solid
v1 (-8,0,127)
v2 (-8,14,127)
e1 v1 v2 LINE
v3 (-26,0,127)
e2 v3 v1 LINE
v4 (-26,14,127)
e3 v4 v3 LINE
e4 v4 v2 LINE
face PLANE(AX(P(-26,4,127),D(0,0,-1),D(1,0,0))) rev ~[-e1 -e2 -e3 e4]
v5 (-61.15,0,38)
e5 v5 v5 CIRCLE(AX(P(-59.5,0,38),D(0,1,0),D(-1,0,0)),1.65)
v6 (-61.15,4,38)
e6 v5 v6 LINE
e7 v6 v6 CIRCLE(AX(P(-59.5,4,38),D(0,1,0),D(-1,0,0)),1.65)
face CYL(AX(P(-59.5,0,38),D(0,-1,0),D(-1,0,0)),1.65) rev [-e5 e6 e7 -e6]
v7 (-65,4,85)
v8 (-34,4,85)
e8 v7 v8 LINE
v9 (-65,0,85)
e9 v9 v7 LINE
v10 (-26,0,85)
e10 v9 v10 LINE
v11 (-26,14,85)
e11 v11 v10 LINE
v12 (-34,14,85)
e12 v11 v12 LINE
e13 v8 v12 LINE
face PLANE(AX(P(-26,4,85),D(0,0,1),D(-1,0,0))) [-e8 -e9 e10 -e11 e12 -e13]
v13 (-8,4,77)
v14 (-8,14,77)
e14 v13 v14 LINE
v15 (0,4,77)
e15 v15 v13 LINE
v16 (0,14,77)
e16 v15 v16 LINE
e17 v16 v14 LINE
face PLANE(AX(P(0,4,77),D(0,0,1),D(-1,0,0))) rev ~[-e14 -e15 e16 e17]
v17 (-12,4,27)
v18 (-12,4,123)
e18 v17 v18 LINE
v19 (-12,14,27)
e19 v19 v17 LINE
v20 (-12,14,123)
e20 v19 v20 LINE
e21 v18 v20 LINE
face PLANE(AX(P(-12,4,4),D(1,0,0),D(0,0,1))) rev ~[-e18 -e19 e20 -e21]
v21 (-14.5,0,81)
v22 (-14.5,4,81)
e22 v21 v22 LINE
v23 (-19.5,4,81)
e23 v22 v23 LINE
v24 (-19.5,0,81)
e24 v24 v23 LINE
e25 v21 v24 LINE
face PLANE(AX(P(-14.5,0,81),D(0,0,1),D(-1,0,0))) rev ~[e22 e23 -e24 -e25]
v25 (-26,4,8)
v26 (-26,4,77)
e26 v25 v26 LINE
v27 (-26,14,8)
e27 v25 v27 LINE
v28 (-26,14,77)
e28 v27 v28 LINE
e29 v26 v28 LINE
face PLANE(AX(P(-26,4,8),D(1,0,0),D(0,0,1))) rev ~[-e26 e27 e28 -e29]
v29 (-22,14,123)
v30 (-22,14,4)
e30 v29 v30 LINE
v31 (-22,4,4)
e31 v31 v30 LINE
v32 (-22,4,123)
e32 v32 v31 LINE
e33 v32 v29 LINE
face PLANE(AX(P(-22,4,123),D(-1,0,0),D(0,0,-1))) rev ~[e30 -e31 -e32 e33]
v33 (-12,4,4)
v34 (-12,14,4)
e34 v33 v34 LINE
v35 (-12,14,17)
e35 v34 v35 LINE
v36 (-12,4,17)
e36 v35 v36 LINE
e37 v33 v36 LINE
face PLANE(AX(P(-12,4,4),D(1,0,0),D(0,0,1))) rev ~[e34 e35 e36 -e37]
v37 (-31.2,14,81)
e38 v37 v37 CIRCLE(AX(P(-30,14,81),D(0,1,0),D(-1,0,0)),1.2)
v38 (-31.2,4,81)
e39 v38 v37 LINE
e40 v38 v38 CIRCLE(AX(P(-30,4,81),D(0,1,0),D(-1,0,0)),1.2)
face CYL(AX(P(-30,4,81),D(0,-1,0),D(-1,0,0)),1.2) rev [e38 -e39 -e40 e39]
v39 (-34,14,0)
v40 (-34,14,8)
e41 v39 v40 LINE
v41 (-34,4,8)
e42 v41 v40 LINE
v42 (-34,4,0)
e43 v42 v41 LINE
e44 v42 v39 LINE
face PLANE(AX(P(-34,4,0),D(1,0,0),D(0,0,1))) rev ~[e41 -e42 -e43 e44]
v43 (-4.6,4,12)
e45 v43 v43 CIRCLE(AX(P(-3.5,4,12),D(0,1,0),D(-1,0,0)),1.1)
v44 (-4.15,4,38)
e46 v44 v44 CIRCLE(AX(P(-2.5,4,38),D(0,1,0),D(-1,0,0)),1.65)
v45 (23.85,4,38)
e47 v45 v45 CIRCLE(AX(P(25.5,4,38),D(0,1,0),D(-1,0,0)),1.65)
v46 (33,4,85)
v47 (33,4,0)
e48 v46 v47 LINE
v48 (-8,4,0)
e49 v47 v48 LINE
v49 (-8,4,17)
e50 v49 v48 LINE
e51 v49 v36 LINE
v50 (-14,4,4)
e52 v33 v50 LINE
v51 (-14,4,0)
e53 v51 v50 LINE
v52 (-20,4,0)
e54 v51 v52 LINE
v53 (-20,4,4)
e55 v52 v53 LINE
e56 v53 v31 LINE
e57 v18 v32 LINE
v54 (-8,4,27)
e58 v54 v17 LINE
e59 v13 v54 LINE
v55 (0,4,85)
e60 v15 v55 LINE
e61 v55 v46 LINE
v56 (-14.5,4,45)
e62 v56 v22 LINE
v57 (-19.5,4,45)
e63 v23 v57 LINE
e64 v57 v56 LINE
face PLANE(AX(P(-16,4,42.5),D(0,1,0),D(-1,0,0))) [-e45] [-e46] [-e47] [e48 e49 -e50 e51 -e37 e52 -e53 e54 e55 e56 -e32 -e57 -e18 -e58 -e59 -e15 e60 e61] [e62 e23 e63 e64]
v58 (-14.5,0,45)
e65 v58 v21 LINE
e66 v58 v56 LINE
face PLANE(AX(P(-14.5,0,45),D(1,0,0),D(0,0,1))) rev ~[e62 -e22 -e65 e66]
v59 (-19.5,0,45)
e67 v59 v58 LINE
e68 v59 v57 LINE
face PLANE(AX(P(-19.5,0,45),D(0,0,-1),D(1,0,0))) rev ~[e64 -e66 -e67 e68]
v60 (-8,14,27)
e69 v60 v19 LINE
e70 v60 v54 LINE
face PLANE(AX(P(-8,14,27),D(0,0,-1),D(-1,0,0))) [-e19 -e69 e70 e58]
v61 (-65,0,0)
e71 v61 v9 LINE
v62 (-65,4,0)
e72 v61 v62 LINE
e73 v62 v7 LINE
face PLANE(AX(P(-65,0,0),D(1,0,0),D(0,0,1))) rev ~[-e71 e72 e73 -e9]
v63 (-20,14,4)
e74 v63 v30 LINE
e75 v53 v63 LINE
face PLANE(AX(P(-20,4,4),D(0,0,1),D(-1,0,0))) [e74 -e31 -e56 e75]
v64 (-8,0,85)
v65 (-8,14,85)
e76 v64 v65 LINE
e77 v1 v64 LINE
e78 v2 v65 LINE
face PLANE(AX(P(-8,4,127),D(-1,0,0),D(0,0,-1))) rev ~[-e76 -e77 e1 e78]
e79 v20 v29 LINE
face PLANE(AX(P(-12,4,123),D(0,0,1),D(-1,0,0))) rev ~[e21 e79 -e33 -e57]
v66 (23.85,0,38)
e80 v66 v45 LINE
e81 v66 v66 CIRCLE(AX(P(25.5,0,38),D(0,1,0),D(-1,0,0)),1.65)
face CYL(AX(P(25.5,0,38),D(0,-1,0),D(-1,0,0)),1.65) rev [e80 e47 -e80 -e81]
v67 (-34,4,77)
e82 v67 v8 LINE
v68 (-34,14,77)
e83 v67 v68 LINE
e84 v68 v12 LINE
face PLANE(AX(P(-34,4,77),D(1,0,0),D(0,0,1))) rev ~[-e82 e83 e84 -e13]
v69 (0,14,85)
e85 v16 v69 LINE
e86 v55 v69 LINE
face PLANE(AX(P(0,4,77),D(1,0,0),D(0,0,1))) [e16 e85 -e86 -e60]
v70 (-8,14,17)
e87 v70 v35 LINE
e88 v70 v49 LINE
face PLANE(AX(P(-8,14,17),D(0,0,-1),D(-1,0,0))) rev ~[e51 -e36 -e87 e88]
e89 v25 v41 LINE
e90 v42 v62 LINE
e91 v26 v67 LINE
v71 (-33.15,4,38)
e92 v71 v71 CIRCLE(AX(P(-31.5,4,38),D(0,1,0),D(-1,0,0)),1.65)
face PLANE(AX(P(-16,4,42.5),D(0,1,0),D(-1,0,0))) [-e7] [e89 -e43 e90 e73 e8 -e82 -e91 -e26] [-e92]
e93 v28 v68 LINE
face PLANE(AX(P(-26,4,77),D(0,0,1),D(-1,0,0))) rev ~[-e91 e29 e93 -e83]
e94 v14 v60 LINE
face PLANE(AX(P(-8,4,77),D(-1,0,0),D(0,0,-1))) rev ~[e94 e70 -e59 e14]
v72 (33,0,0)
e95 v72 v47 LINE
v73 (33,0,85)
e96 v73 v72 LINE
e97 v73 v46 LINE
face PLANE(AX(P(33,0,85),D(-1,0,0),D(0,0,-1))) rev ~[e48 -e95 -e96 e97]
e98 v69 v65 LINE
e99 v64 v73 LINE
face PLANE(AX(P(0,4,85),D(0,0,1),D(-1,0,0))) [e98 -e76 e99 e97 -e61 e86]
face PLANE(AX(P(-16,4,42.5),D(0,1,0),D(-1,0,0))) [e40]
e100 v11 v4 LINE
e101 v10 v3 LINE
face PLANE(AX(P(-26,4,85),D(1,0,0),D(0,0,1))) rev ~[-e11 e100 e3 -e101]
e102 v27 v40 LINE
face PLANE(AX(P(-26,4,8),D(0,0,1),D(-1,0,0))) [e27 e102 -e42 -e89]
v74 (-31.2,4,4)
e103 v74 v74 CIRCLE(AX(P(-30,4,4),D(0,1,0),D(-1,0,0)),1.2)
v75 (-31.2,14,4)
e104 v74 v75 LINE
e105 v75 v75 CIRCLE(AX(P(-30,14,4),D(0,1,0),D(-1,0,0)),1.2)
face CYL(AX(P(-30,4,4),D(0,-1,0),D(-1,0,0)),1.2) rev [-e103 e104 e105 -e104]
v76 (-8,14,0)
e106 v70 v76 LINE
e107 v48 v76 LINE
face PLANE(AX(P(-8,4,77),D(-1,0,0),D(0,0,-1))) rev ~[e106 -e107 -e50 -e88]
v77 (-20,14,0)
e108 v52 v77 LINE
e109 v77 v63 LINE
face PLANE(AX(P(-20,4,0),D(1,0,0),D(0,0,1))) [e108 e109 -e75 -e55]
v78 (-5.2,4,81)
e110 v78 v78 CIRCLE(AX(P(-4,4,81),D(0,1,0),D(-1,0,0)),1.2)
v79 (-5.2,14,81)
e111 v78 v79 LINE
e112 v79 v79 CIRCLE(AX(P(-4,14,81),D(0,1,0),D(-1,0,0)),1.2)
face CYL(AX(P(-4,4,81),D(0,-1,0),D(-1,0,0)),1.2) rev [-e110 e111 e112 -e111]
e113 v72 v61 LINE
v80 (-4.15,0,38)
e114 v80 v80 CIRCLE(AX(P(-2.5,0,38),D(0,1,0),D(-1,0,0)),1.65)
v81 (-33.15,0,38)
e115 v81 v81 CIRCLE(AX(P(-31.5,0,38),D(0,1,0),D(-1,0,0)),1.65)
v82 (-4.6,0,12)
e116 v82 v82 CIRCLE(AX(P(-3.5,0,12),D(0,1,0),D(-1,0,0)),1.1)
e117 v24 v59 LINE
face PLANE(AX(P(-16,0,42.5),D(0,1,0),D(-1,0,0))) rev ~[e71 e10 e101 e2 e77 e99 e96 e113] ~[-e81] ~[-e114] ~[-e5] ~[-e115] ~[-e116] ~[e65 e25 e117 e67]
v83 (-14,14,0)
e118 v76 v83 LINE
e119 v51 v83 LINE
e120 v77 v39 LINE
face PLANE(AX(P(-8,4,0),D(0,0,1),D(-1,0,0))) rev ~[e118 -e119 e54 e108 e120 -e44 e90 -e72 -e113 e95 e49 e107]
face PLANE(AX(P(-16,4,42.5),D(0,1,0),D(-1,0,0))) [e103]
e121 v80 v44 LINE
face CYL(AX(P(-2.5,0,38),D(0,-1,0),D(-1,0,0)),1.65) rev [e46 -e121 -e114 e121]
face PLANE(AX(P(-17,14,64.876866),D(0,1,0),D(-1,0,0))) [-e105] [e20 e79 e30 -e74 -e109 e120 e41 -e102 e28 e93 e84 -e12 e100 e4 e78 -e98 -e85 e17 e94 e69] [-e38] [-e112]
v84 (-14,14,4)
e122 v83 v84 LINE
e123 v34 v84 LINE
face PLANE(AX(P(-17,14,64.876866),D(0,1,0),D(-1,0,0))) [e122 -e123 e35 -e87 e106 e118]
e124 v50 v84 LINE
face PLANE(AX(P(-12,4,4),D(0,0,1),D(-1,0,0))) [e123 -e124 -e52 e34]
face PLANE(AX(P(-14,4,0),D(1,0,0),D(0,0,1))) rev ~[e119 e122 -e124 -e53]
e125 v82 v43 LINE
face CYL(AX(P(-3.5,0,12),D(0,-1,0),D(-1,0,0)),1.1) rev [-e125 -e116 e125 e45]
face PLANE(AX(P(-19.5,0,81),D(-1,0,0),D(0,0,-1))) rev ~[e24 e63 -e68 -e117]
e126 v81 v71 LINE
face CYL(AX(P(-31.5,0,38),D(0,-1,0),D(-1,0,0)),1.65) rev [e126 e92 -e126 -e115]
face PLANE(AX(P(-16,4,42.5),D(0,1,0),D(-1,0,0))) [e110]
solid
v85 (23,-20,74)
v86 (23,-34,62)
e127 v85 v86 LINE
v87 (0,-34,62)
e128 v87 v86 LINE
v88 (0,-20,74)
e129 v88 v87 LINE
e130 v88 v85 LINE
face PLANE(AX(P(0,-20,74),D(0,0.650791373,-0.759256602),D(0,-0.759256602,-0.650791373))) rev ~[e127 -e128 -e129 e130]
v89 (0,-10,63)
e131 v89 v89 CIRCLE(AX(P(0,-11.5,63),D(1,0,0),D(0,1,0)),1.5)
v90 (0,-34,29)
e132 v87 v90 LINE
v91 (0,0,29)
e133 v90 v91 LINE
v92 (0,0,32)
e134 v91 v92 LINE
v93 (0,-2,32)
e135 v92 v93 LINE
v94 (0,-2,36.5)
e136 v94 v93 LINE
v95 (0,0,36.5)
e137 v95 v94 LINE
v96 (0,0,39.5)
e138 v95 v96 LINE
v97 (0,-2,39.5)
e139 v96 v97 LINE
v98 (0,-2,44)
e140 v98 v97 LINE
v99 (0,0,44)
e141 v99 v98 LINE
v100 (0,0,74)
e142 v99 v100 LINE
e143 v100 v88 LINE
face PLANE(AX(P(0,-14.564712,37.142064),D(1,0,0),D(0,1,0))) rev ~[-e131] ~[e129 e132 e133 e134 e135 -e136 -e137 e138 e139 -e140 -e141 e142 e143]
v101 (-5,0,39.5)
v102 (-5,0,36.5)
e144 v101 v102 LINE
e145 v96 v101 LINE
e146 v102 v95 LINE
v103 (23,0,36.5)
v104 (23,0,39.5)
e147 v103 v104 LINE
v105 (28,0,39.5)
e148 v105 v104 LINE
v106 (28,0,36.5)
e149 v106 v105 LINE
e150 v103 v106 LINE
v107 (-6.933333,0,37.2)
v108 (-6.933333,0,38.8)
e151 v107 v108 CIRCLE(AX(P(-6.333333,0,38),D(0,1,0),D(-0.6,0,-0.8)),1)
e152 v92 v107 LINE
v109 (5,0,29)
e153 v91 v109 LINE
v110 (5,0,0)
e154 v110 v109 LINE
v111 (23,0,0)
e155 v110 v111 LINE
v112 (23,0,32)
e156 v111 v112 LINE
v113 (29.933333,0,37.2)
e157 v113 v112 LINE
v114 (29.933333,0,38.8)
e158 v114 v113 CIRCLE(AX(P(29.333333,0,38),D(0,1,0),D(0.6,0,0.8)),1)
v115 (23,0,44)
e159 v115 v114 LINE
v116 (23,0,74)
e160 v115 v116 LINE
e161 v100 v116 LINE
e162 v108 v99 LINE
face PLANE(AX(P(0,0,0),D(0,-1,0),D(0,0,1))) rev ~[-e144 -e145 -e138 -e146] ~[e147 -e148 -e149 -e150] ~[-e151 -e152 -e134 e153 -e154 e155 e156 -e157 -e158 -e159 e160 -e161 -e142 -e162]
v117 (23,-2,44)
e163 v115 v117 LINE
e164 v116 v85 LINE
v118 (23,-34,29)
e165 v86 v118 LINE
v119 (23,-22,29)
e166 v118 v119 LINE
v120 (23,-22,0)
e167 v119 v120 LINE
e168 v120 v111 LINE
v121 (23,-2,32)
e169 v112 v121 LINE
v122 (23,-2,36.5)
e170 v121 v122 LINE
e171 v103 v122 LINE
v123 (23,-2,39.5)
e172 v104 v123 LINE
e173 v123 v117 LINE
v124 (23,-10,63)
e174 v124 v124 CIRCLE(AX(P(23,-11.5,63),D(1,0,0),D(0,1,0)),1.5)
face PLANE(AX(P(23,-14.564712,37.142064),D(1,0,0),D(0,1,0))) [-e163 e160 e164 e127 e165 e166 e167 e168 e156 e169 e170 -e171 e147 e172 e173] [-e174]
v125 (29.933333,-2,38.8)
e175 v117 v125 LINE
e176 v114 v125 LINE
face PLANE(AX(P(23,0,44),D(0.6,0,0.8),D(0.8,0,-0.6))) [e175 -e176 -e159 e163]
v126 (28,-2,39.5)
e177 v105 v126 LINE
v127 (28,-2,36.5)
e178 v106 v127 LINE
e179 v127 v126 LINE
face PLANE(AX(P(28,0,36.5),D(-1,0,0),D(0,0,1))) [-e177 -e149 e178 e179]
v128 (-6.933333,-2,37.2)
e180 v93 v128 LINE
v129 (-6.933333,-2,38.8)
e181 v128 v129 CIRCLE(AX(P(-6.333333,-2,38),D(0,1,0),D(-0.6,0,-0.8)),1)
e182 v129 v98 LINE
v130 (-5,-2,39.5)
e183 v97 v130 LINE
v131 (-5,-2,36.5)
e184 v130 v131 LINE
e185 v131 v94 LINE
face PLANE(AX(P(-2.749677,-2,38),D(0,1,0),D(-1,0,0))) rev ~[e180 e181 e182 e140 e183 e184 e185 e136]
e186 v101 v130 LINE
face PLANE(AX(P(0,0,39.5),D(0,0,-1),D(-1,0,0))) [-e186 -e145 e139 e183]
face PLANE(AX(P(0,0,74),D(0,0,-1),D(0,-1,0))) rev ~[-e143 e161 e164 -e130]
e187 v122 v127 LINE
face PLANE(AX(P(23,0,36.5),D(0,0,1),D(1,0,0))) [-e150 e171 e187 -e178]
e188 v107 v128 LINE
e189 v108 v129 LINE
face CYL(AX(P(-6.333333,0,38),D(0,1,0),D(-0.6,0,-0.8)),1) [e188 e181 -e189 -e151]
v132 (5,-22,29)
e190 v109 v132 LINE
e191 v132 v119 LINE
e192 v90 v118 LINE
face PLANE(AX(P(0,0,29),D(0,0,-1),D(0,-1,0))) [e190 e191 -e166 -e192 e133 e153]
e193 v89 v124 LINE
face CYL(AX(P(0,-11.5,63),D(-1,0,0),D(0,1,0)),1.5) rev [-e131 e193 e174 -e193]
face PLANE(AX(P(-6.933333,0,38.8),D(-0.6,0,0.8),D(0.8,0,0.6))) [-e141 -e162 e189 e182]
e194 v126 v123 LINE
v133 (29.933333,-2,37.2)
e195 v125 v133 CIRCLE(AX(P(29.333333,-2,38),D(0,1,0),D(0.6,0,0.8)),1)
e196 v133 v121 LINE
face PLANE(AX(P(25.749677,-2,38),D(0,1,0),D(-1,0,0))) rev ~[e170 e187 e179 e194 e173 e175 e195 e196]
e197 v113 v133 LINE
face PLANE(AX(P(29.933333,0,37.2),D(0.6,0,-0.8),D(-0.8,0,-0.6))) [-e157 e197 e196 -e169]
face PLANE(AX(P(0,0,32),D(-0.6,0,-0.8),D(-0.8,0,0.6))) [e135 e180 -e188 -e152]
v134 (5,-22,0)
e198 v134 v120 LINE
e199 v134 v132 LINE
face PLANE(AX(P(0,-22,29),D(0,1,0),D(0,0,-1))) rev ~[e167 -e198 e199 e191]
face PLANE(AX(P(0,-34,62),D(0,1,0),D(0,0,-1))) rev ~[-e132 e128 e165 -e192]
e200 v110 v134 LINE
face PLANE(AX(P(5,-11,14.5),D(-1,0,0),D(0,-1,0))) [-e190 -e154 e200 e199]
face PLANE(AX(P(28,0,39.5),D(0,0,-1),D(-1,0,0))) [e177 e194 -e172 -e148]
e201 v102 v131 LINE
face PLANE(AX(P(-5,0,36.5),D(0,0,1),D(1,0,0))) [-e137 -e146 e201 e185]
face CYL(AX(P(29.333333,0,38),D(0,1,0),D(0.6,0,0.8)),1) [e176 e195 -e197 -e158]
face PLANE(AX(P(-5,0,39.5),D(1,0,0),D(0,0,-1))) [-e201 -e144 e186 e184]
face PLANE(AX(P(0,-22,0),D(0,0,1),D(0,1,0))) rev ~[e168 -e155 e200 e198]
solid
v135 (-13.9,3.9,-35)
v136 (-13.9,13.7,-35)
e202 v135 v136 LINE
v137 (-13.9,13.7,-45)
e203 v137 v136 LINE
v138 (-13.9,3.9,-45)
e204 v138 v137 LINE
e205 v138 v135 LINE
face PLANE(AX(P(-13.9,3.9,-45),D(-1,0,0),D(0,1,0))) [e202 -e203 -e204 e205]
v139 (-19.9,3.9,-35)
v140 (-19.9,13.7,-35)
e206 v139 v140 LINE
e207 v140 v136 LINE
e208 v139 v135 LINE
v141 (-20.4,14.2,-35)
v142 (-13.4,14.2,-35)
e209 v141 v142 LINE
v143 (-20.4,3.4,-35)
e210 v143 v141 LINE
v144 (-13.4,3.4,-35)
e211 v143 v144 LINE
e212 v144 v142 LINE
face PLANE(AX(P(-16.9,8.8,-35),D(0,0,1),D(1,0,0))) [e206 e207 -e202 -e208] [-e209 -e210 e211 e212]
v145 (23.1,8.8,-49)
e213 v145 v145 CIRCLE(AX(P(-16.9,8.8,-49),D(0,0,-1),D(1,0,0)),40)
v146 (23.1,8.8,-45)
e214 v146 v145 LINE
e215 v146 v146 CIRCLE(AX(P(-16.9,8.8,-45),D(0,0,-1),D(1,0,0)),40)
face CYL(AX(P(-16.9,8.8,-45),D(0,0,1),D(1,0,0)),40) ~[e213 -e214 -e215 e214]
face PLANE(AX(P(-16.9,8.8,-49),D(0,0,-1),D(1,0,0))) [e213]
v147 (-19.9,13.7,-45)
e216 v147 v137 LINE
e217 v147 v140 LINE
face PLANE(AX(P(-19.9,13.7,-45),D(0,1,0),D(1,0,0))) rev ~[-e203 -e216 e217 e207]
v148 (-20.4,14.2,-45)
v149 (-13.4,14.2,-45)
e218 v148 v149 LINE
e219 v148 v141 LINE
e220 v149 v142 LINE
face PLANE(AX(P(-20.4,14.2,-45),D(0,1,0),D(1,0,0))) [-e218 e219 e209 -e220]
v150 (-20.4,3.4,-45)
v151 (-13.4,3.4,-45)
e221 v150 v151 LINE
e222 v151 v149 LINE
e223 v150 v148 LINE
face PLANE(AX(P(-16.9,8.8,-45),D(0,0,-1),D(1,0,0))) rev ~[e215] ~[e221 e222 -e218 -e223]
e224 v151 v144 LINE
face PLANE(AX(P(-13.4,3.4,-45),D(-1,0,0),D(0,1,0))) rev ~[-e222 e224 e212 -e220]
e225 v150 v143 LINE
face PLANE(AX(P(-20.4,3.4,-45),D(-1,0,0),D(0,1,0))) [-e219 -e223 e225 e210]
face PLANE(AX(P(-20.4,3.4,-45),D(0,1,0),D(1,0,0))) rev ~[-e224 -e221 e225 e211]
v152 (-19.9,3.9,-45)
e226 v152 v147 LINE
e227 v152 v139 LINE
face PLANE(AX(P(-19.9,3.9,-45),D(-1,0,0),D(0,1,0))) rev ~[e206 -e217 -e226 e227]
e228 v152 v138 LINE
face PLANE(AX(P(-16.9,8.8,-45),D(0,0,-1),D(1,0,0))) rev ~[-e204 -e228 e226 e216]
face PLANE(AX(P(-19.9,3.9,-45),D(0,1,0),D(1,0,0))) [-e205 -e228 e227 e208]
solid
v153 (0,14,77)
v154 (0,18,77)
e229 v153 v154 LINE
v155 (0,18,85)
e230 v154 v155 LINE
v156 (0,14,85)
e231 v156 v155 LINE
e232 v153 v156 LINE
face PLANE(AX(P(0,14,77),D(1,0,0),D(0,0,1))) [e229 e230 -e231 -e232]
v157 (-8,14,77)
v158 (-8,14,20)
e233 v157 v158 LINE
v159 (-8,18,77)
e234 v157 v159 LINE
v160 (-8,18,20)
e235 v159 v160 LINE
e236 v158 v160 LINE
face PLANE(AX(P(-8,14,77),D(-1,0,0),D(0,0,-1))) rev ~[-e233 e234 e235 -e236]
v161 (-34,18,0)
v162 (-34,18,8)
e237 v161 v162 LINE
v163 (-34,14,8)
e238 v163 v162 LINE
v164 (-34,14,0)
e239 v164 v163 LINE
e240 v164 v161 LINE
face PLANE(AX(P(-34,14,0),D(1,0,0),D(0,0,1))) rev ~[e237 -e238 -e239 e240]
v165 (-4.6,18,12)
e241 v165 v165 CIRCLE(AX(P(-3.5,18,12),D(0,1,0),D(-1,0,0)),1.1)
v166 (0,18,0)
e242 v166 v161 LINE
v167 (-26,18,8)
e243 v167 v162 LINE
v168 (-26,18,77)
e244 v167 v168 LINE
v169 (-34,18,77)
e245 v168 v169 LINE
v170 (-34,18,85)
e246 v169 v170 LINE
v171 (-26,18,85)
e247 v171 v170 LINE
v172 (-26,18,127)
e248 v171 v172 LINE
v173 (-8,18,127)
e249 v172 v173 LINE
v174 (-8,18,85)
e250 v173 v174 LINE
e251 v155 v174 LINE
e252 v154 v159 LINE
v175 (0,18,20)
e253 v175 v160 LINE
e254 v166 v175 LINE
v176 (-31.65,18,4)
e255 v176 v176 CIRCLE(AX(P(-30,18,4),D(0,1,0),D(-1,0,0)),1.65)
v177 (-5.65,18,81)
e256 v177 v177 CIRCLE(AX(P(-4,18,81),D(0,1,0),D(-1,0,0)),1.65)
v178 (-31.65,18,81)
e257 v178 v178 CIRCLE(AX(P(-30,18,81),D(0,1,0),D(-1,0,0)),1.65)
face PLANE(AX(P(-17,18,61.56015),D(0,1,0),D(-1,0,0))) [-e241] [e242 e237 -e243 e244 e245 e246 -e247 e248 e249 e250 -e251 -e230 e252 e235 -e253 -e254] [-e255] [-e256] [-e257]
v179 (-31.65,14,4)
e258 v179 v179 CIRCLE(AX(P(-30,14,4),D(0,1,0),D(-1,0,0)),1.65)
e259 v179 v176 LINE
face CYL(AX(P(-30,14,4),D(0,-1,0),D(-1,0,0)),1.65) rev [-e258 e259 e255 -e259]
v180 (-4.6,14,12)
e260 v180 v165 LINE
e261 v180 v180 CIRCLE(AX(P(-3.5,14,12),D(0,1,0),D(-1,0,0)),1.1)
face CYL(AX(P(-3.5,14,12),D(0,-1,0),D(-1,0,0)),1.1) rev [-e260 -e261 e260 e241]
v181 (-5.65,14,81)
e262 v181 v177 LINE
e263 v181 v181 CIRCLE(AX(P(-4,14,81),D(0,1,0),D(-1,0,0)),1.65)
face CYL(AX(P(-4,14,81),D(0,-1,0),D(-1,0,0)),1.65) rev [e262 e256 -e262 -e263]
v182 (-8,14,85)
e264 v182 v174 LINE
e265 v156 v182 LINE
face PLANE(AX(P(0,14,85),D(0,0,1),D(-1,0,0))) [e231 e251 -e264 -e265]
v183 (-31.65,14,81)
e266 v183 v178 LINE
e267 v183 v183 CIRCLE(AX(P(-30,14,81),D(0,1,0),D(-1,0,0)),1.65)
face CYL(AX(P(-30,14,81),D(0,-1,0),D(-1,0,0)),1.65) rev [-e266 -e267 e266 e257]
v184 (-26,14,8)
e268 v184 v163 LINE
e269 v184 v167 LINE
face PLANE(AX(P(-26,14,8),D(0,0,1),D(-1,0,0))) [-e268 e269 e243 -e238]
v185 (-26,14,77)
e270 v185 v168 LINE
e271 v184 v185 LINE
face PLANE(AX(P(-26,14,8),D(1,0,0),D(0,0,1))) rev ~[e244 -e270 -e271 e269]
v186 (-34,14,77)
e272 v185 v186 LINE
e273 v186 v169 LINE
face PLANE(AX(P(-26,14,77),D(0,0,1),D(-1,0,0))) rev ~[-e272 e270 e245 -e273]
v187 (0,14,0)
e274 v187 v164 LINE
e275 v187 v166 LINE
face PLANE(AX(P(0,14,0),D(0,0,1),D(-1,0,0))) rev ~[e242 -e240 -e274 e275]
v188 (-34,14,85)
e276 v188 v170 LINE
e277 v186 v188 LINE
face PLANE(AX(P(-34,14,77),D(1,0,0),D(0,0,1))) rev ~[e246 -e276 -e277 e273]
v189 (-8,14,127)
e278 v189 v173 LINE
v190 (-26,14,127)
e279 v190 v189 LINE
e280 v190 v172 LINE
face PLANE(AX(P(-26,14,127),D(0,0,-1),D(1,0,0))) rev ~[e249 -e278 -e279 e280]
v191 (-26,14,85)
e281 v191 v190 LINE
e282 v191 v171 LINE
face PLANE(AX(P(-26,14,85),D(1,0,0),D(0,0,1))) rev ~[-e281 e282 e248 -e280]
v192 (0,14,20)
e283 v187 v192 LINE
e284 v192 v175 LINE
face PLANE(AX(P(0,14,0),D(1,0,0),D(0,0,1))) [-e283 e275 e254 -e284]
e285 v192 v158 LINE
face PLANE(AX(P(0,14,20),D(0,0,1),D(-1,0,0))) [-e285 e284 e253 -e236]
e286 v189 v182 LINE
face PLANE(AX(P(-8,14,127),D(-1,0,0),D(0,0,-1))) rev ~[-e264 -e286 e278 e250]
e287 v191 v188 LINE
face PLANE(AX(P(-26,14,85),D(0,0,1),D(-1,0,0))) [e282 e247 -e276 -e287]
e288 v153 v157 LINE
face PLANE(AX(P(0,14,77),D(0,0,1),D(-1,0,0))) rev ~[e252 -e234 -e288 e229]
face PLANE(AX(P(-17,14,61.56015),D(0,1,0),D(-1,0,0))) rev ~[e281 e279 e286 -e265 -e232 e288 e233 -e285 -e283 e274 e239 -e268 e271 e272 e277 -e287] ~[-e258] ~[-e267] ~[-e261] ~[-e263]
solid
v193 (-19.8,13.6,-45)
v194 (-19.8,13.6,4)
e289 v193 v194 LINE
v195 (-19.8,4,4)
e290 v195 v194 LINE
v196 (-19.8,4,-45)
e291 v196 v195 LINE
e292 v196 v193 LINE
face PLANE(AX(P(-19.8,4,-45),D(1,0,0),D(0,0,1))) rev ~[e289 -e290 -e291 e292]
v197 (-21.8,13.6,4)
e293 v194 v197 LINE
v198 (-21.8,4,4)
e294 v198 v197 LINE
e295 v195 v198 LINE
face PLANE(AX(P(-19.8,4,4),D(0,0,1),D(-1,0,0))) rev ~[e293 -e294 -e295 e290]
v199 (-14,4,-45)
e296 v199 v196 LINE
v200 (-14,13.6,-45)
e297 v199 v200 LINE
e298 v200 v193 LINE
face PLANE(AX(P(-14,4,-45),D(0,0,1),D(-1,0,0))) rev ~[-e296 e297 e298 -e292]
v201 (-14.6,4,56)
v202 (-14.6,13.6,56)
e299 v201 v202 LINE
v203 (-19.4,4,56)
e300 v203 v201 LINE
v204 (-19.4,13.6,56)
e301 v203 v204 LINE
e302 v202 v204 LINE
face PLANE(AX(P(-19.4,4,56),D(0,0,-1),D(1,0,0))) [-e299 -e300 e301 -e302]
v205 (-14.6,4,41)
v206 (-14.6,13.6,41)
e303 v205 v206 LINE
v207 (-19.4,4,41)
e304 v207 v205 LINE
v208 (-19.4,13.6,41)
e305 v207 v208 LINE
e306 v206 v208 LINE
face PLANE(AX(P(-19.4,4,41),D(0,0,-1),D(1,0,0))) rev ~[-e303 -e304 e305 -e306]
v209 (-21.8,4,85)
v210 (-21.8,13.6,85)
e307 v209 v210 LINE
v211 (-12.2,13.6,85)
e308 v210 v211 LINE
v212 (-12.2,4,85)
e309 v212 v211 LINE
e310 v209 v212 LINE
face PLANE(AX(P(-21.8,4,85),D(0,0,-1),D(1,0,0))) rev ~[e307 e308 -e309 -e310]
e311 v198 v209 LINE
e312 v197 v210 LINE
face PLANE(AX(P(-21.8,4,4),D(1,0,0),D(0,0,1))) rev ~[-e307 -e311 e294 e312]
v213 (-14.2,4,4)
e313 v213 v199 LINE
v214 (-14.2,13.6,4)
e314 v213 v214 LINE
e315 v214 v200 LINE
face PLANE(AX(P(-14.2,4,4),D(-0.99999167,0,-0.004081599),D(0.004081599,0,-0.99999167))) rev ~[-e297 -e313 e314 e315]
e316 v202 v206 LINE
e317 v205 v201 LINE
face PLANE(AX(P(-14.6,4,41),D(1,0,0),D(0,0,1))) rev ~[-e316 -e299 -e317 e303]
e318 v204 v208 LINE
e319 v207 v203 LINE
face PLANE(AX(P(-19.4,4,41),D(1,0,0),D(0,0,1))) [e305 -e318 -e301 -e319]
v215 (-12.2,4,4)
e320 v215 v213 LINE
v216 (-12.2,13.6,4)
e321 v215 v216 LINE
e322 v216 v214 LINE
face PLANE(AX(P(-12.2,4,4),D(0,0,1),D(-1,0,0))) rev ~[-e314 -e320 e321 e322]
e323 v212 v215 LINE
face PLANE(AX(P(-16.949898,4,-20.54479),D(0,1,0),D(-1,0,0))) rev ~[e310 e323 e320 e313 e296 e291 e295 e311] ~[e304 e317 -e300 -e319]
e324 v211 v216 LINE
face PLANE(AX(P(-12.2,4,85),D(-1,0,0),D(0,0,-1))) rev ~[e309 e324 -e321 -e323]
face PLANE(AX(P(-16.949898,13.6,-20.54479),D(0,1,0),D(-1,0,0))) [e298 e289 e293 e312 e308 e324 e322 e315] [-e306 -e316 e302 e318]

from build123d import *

# Parameters (mm, degrees)
F0_R      = 1.5
F1_DEPTH  = 23
F2_W      = 22
F2_H      = 29
F3_DEPTH  = 5
F5_DEPTH  = 2
F6_R      = 1.1
F6_R_2    = 1.65
F7_DEPTH  = 4
F8_W      = 8
F8_H      = 8
F8_R      = 1.2
F8_W_2    = 2
F8_H_2    = 4
F9_DEPTH  = 10
F10_W     = 8
F10_H     = 8
F10_R     = 1.65
F10_H_2   = 20
F10_R_2   = 1.1
F11_DEPTH = 4
F13_DEPTH = 9.6
F14_W     = 4.8
F14_H     = 15
F15_DEPTH = 25
F16_R     = 40
F17_DEPTH = 4
F18_W     = 7
F18_H     = 10.8
F18_W_2   = 6
F18_H_2   = 9.8
F19_DEPTH = 10
F20_W     = 4
F20_H     = 10
F21_DEPTH = 10


# Not quite as in the source:
# - a feature names something its author has since deleted; it is built from what else it names


with BuildPart() as f1:
    # F0 (on Right) → F1 (new body)
    with BuildSketch(Plane.YZ):
        Polygon((-22, 0), (0, 0), (0, 74), (-20, 74), (-34, 62), (-34, 29), (-22, 29), align=None)
        with Locations((-11.5, 63)):
            Circle(F0_R, mode=Mode.SUBTRACT)
    extrude(amount=F1_DEPTH)

    # F2 (on face) → F3 (cut)
    with BuildSketch(Plane(origin=(0, 0, 0), x_dir=(0, -1, 0), z_dir=(-1, 0, 0))):
        with Locations((11, 14.5)):
            Rectangle(F2_W, F2_H)
    extrude(amount=-F3_DEPTH, mode=Mode.SUBTRACT)

    # F4 (on face) → F5 (join)
    with BuildSketch(Plane(origin=(0, 0, 0), x_dir=(-1, 0, 0), z_dir=(0, 1, 0))):
        with BuildLine():
            Line((6.9333333333, 38.8), (0, 44))
            Line((0, 44), (0, 39.5))
            Line((0, 39.5), (5, 39.5))
            Line((5, 39.5), (5, 36.5))
            Line((5, 36.5), (0, 36.5))
            Line((0, 36.5), (0, 32))
            Line((0, 32), (6.9333333333, 37.2))
            ThreePointArc((6.9333333333, 37.2), (7.3333333333, 38), (6.9333333333, 38.8))
        make_face()
        with BuildLine():
            Line((-23, 39.5), (-23, 44))
            Line((-23, 44), (-29.9333333333, 38.8))
            ThreePointArc((-29.9333333333, 38.8), (-30.3333333333, 38), (-29.9333333333, 37.2))
            Line((-29.9333333333, 37.2), (-23, 32))
            Line((-23, 32), (-23, 36.5))
            Line((-23, 36.5), (-28, 36.5))
            Line((-28, 36.5), (-28, 39.5))
            Line((-28, 39.5), (-23, 39.5))
        make_face()
    extrude(amount=-F5_DEPTH)


with BuildPart() as f7:
    # F6 (on face) → F7 (new body)
    with BuildSketch(Plane(origin=(0, 0, 0), x_dir=(-1, 0, 0), z_dir=(0, 1, 0))):
        Polygon((-33, 79), (-33, 0), (65, 0), (65, 85), (26, 85), (8, 85), (-33, 85), align=None)
        with Locations((3.5, 12)):
            Circle(F6_R, mode=Mode.SUBTRACT)
        with Locations((-25.5, 38)):
            Circle(F6_R_2, mode=Mode.SUBTRACT)
        with Locations((2.5, 38)):
            Circle(F6_R_2, mode=Mode.SUBTRACT)
        with Locations((31.5, 38)):
            Circle(F6_R_2, mode=Mode.SUBTRACT)
        Polygon((14.5, 81), (17, 81), (19.5, 81), (19.5, 45), (17, 45), (14.5, 45), align=None, mode=Mode.SUBTRACT)
        with Locations((59.5, 38)):
            Circle(F6_R_2, mode=Mode.SUBTRACT)
        Polygon((8, 85), (26, 85), (26, 127), (17, 127), (8, 127), align=None)
    extrude(amount=F7_DEPTH)

    # F8 (on face) → F9 (join)
    with BuildSketch(Plane(origin=(0, 4, 0), x_dir=(-1, 0, 0), z_dir=(0, 1, 0))):
        Polygon((26, 127), (8, 127), (8, 85), (8, 77), (8, 0), (12, 0), (12, 4), (12, 123), (22, 123), (22, 4), (22, 0), (26, 0), (26, 8), (26, 77), (26, 85), align=None)
        with Locations((30, 81)):
            Rectangle(F8_W, F8_H)
        with Locations((30, 81)):
            Circle(F8_R, mode=Mode.SUBTRACT)
        with Locations((4, 81)):
            Rectangle(F8_W, F8_H)
        with Locations((4, 81)):
            Circle(F8_R, mode=Mode.SUBTRACT)
        with Locations((30, 4)):
            Rectangle(F8_W, F8_H)
        with Locations((30, 4)):
            Circle(F8_R, mode=Mode.SUBTRACT)
        with Locations((13, 2)):
            Rectangle(F8_W_2, F8_H_2)
        with Locations((21, 2)):
            Rectangle(F8_W_2, F8_H_2)
    extrude(amount=F9_DEPTH)

    # F20 (on face) → F21 (cut)
    with BuildSketch(Plane(origin=(0, 14, 0), x_dir=(-1, 0, 0), z_dir=(0, 1, 0))):
        with Locations((10, 22)):
            Rectangle(F20_W, F20_H)
    extrude(amount=-F21_DEPTH, mode=Mode.SUBTRACT)


with BuildPart() as f11:
    # F10 (on face) → F11 (new body)
    with BuildSketch(Plane(origin=(0, 14, 0), x_dir=(-1, 0, 0), z_dir=(0, 1, 0))):
        Polygon((14, 4), (14, 0), (20, 0), (20, 4), (22, 4), (22, 123), (12, 123), (12, 4), align=None)
        with Locations((30, 4)):
            Rectangle(F10_W, F10_H)
        with Locations((30, 4)):
            Circle(F10_R, mode=Mode.SUBTRACT)
        with Locations((30, 81)):
            Rectangle(F10_W, F10_H)
        with Locations((30, 81)):
            Circle(F10_R, mode=Mode.SUBTRACT)
        with Locations((4, 81)):
            Rectangle(F10_W, F10_H)
        with Locations((4, 81)):
            Circle(F10_R, mode=Mode.SUBTRACT)
        Polygon((8, 20), (8, 0), (14, 0), (14, 4), (12, 4), (12, 123), (22, 123), (22, 4), (20, 4), (20, 0), (26, 0), (26, 8), (26, 77), (26, 85), (26, 127), (8, 127), (8, 85), (8, 77), align=None)
        with Locations((4, 10)):
            Rectangle(F10_W, F10_H_2)
        with Locations((3.5, 12)):
            Circle(F10_R_2, mode=Mode.SUBTRACT)
    extrude(amount=F11_DEPTH)


with BuildPart() as f13:
    # F12 (on face) → F13 (new body)
    with BuildSketch(Plane(origin=(0, 4, 0), x_dir=(-1, 0, 0), z_dir=(0, 1, 0))):
        Polygon((19.8, 4), (17, 4), (14.2, 4), (14, -45), (19.8, -45), align=None)
        Polygon((14.2, 4), (17, 4), (19.8, 4), (21.8, 4), (21.8, 85), (12.2, 85), (12.2, 4), align=None)
    extrude(amount=F13_DEPTH)

    # F14 (on face) → F15 (cut)
    with BuildSketch(Plane.XZ.offset(-4)):
        with Locations((-17, 48.5)):
            Rectangle(F14_W, F14_H)
    extrude(amount=-F15_DEPTH, mode=Mode.SUBTRACT)


with BuildPart() as f17:
    # F16 (on face) → F17 (new body)
    with BuildSketch(Plane(origin=(0, 0, -45), x_dir=(1, 0, 0), z_dir=(0, 0, -1))):
        with Locations((-16.9, -8.8)):
            Circle(F16_R)
    extrude(amount=F17_DEPTH)

    # F18 (on face) → F19 (join)
    with BuildSketch(Plane.XY.offset(-45)):
        with Locations((-16.9, 8.8)):
            Rectangle(F18_W, F18_H)
        with Locations((-16.9, 8.8)):
            Rectangle(F18_W_2, F18_H_2, mode=Mode.SUBTRACT)
    extrude(amount=F19_DEPTH)


solid = Compound([f1.part, f7.part, f11.part, f13.part, f17.part])
